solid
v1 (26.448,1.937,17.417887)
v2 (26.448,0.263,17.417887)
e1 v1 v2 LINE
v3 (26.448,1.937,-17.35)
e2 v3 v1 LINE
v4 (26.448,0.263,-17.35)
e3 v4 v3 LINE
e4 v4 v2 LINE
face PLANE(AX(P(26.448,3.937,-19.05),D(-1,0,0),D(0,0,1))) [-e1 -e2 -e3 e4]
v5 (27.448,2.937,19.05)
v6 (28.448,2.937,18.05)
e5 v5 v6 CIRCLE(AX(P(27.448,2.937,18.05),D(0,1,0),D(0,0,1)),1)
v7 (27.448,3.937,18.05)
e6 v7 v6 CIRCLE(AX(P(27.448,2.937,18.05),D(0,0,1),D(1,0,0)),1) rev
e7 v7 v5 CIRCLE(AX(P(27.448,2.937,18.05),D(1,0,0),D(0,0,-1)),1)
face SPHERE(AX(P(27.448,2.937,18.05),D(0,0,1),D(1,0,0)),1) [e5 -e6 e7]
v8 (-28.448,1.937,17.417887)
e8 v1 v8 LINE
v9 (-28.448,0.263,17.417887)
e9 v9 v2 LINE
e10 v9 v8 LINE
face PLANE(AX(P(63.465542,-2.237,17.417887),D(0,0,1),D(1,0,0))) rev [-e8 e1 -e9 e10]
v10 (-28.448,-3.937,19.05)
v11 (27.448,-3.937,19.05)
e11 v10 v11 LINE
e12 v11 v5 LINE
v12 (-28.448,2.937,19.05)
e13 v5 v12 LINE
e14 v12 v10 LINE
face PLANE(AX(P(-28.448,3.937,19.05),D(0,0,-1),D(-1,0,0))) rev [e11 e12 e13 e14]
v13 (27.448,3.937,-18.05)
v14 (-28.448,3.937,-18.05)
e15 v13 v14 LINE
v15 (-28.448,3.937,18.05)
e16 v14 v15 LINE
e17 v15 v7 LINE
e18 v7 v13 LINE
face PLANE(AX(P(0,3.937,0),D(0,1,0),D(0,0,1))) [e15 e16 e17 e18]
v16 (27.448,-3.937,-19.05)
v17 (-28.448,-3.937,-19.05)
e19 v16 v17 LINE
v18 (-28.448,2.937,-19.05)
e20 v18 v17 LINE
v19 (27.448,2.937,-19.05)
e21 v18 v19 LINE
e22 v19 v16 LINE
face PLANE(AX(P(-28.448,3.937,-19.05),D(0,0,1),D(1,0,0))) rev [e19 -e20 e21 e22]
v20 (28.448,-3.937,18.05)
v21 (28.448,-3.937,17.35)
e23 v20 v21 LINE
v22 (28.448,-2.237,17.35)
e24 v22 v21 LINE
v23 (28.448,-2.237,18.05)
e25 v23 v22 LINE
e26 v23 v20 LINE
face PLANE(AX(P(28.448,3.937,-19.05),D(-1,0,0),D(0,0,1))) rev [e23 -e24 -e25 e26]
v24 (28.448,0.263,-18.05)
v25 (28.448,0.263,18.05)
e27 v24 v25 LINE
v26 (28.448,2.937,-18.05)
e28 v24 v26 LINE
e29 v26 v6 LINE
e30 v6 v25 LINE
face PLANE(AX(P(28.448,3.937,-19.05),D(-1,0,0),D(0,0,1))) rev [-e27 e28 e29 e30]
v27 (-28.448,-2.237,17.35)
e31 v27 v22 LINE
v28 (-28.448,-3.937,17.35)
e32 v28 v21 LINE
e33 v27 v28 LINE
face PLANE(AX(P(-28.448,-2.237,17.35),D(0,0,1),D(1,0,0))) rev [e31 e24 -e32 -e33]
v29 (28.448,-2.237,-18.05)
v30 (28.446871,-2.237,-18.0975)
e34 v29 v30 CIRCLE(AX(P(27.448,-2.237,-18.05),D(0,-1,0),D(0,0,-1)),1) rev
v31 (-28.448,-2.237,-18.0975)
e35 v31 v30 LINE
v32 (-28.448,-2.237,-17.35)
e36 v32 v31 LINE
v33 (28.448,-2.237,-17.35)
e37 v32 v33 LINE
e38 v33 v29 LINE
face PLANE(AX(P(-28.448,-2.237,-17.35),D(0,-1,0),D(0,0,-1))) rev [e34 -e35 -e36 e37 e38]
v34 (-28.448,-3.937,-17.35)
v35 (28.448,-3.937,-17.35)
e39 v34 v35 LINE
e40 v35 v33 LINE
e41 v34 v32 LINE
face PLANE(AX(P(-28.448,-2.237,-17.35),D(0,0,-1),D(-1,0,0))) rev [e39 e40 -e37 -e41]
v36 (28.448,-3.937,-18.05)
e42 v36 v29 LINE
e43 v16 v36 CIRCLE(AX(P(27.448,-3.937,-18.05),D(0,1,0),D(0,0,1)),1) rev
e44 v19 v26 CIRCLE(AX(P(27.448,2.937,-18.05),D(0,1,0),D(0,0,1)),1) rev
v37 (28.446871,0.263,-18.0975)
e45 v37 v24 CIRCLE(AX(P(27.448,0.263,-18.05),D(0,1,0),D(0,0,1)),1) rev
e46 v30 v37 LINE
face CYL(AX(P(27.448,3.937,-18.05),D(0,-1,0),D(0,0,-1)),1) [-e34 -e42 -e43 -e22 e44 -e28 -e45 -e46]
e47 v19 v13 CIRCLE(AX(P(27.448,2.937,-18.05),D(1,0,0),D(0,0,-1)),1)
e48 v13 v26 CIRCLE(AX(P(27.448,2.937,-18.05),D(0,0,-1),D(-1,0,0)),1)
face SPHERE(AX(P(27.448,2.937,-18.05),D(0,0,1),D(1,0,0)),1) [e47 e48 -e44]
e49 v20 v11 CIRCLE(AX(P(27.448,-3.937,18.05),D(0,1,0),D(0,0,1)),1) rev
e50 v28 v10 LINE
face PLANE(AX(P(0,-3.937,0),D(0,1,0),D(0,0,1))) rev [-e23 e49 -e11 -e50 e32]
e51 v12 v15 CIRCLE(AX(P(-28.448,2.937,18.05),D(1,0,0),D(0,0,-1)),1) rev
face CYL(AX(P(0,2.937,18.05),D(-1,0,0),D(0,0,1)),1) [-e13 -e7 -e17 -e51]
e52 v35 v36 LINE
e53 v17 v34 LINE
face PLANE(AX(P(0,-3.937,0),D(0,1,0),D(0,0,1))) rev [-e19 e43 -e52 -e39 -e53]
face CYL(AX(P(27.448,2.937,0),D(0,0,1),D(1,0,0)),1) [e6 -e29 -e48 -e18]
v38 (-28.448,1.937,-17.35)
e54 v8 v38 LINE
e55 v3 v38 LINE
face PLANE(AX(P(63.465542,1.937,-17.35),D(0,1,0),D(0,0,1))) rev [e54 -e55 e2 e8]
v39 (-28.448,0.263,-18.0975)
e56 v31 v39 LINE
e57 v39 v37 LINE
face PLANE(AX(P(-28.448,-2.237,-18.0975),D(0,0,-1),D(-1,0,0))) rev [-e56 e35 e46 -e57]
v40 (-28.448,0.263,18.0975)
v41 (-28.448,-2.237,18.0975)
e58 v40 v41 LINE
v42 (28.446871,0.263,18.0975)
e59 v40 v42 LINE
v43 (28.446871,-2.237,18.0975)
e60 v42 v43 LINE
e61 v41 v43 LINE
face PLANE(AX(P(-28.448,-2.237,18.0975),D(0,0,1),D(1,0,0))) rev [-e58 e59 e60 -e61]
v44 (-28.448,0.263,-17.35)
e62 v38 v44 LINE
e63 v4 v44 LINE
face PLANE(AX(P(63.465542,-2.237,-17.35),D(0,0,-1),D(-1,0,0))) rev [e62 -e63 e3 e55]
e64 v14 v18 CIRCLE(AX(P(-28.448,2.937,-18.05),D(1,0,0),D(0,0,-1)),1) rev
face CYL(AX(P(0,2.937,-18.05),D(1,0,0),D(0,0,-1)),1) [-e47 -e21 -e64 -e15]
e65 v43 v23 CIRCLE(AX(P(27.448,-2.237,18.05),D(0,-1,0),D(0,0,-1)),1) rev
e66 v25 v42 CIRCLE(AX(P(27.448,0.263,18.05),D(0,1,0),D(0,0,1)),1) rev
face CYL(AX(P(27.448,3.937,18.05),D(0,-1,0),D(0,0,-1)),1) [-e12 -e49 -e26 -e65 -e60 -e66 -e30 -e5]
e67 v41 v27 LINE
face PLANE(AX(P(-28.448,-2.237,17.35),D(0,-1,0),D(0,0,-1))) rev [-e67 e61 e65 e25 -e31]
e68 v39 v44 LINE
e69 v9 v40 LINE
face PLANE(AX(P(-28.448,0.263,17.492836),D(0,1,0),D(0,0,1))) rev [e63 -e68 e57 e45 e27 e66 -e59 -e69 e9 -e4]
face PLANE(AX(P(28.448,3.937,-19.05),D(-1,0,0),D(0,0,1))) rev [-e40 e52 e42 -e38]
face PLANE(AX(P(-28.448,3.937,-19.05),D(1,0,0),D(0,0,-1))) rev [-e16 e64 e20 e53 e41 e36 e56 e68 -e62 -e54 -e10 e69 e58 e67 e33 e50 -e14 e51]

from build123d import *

# Parameters (mm, degrees)
SKETCH1_W           = 56.896
SKETCH1_H           = 38.1
BOSS_EXTRUDE1_DEPTH = 3.937
CUT_EXTRUDE1_DEPTH  = 61.12950428
FILLET1_R           = 1
SKETCH3_W           = 34.767886748
SKETCH3_H           = 4.174
CUT_EXTRUDE2_DEPTH  = 54.896


with BuildPart() as part:
    # Sketch1 → Boss-Extrude1 (new, symmetric)
    with BuildSketch(Plane(origin=(0, 0, 0), x_dir=(1, 0, 0), z_dir=(0, 1, 0))):
        Rectangle(SKETCH1_W, SKETCH1_H)
    extrude(amount=BOSS_EXTRUDE1_DEPTH, both=True)

    # Sketch2 → Cut-Extrude1 (cut, through all)
    with BuildSketch(Plane(origin=(28.448, 0, 0), x_dir=(0, 0, -1), z_dir=(1, 0, 0))):
        Polygon((18.0975, -2.237), (18.0975, 0.263), (17.492836072, 0.263), (-17.492836072, 0.263), (-18.0975, 0.263), (-18.0975, -2.237), (-17.35, -2.237), (-17.35, -3.937), (17.35, -3.937), (17.35, -2.237), align=None)
    extrude(amount=-CUT_EXTRUDE1_DEPTH, mode=Mode.SUBTRACT)

    # Fillet1
    # the kernel refuses this fillet: 1 mm, written as the material it takes off along each edge
    with BuildSketch(Plane(origin=(27.448, 2.937, -18.05), x_dir=(1, 0, 0), z_dir=(0, 0, -1))) as fillet1_piece_1_section:
        Polygon((0, 0), (FILLET1_R, 0), (FILLET1_R, -FILLET1_R), (0, -FILLET1_R), align=None)
    fillet1_piece_1 = extrude(amount=FILLET1_R, mode=Mode.PRIVATE)
    fillet1_piece_1 = fillet1_piece_1 - Plane(origin=(27.448, 2.937, -18.05), x_dir=(-0.7071067811865475, -0.7071067811865475, 0), z_dir=(0, 0, -1)) * Sphere(FILLET1_R, mode=Mode.PRIVATE)
    add(fillet1_piece_1, mode=Mode.SUBTRACT)
    with BuildSketch(Plane(origin=(27.448, 2.937, 18.05), x_dir=(0, 1, 0), z_dir=(1, 0, 0))) as fillet1_piece_2_section:
        Polygon((0, 0), (FILLET1_R, 0), (FILLET1_R, FILLET1_R), (0, FILLET1_R), align=None)
    fillet1_piece_2 = extrude(amount=FILLET1_R, mode=Mode.PRIVATE)
    fillet1_piece_2 = fillet1_piece_2 - Plane(origin=(27.448, 2.937, 18.05), x_dir=(0, -0.7071067811865475, -0.7071067811865475), z_dir=(1, 0, 0)) * Sphere(FILLET1_R, mode=Mode.PRIVATE)
    add(fillet1_piece_2, mode=Mode.SUBTRACT)
    with BuildSketch(Plane(origin=(-30.948, 3.937, -19.05), x_dir=(0, -1, 0), z_dir=(1, 0, 0))) as fillet1_piece_3:
        with BuildLine():
            CenterArc((FILLET1_R, -FILLET1_R), FILLET1_R, 90, 90)
            Line((0, -FILLET1_R), (0, 0))
            Line((0, 0), (FILLET1_R, 0))
        make_face()
    extrude(amount=58.396, mode=Mode.SUBTRACT)
    with BuildSketch(Plane(origin=(28.448, 3.937, -18.05), x_dir=(0, -1, 0), z_dir=(0, 0, 1))) as fillet1_piece_4:
        with BuildLine():
            CenterArc((FILLET1_R, -FILLET1_R), FILLET1_R, 90, 90)
            Line((0, -FILLET1_R), (0, 0))
            Line((0, 0), (FILLET1_R, 0))
        make_face()
    extrude(amount=36.1, mode=Mode.SUBTRACT)
    with BuildSketch(Plane(origin=(27.448, 3.937, 19.05), x_dir=(0, 0, -1), z_dir=(-1, 0, 0))) as fillet1_piece_5:
        with BuildLine():
            CenterArc((FILLET1_R, FILLET1_R), FILLET1_R, 180, 90)
            Line((0, FILLET1_R), (0, 0))
            Line((0, 0), (FILLET1_R, 0))
        make_face()
    extrude(amount=58.396, mode=Mode.SUBTRACT)
    with BuildSketch(Plane(origin=(28.448, 2.937, -19.05), x_dir=(-1, 0, 0), z_dir=(0, -1, 0)), Plane(origin=(28.448, 2.937, 19.05), x_dir=(0, 0, -1), z_dir=(0, -1, 0))) as fillet1_piece_6:
        with BuildLine():
            CenterArc((FILLET1_R, -FILLET1_R), FILLET1_R, 90, 90)
            Line((0, -FILLET1_R), (0, 0))
            Line((0, 0), (FILLET1_R, 0))
        make_face()
    extrude(amount=9.374, mode=Mode.SUBTRACT)

    # Sketch3 → Cut-Extrude2 (cut)
    with BuildSketch(Plane.ZY.offset(28.448)):
        with Locations((0.033943374, -0.15)):
            Rectangle(SKETCH3_W, SKETCH3_H)
    extrude(amount=-CUT_EXTRUDE2_DEPTH, mode=Mode.SUBTRACT)


solid = part.part
